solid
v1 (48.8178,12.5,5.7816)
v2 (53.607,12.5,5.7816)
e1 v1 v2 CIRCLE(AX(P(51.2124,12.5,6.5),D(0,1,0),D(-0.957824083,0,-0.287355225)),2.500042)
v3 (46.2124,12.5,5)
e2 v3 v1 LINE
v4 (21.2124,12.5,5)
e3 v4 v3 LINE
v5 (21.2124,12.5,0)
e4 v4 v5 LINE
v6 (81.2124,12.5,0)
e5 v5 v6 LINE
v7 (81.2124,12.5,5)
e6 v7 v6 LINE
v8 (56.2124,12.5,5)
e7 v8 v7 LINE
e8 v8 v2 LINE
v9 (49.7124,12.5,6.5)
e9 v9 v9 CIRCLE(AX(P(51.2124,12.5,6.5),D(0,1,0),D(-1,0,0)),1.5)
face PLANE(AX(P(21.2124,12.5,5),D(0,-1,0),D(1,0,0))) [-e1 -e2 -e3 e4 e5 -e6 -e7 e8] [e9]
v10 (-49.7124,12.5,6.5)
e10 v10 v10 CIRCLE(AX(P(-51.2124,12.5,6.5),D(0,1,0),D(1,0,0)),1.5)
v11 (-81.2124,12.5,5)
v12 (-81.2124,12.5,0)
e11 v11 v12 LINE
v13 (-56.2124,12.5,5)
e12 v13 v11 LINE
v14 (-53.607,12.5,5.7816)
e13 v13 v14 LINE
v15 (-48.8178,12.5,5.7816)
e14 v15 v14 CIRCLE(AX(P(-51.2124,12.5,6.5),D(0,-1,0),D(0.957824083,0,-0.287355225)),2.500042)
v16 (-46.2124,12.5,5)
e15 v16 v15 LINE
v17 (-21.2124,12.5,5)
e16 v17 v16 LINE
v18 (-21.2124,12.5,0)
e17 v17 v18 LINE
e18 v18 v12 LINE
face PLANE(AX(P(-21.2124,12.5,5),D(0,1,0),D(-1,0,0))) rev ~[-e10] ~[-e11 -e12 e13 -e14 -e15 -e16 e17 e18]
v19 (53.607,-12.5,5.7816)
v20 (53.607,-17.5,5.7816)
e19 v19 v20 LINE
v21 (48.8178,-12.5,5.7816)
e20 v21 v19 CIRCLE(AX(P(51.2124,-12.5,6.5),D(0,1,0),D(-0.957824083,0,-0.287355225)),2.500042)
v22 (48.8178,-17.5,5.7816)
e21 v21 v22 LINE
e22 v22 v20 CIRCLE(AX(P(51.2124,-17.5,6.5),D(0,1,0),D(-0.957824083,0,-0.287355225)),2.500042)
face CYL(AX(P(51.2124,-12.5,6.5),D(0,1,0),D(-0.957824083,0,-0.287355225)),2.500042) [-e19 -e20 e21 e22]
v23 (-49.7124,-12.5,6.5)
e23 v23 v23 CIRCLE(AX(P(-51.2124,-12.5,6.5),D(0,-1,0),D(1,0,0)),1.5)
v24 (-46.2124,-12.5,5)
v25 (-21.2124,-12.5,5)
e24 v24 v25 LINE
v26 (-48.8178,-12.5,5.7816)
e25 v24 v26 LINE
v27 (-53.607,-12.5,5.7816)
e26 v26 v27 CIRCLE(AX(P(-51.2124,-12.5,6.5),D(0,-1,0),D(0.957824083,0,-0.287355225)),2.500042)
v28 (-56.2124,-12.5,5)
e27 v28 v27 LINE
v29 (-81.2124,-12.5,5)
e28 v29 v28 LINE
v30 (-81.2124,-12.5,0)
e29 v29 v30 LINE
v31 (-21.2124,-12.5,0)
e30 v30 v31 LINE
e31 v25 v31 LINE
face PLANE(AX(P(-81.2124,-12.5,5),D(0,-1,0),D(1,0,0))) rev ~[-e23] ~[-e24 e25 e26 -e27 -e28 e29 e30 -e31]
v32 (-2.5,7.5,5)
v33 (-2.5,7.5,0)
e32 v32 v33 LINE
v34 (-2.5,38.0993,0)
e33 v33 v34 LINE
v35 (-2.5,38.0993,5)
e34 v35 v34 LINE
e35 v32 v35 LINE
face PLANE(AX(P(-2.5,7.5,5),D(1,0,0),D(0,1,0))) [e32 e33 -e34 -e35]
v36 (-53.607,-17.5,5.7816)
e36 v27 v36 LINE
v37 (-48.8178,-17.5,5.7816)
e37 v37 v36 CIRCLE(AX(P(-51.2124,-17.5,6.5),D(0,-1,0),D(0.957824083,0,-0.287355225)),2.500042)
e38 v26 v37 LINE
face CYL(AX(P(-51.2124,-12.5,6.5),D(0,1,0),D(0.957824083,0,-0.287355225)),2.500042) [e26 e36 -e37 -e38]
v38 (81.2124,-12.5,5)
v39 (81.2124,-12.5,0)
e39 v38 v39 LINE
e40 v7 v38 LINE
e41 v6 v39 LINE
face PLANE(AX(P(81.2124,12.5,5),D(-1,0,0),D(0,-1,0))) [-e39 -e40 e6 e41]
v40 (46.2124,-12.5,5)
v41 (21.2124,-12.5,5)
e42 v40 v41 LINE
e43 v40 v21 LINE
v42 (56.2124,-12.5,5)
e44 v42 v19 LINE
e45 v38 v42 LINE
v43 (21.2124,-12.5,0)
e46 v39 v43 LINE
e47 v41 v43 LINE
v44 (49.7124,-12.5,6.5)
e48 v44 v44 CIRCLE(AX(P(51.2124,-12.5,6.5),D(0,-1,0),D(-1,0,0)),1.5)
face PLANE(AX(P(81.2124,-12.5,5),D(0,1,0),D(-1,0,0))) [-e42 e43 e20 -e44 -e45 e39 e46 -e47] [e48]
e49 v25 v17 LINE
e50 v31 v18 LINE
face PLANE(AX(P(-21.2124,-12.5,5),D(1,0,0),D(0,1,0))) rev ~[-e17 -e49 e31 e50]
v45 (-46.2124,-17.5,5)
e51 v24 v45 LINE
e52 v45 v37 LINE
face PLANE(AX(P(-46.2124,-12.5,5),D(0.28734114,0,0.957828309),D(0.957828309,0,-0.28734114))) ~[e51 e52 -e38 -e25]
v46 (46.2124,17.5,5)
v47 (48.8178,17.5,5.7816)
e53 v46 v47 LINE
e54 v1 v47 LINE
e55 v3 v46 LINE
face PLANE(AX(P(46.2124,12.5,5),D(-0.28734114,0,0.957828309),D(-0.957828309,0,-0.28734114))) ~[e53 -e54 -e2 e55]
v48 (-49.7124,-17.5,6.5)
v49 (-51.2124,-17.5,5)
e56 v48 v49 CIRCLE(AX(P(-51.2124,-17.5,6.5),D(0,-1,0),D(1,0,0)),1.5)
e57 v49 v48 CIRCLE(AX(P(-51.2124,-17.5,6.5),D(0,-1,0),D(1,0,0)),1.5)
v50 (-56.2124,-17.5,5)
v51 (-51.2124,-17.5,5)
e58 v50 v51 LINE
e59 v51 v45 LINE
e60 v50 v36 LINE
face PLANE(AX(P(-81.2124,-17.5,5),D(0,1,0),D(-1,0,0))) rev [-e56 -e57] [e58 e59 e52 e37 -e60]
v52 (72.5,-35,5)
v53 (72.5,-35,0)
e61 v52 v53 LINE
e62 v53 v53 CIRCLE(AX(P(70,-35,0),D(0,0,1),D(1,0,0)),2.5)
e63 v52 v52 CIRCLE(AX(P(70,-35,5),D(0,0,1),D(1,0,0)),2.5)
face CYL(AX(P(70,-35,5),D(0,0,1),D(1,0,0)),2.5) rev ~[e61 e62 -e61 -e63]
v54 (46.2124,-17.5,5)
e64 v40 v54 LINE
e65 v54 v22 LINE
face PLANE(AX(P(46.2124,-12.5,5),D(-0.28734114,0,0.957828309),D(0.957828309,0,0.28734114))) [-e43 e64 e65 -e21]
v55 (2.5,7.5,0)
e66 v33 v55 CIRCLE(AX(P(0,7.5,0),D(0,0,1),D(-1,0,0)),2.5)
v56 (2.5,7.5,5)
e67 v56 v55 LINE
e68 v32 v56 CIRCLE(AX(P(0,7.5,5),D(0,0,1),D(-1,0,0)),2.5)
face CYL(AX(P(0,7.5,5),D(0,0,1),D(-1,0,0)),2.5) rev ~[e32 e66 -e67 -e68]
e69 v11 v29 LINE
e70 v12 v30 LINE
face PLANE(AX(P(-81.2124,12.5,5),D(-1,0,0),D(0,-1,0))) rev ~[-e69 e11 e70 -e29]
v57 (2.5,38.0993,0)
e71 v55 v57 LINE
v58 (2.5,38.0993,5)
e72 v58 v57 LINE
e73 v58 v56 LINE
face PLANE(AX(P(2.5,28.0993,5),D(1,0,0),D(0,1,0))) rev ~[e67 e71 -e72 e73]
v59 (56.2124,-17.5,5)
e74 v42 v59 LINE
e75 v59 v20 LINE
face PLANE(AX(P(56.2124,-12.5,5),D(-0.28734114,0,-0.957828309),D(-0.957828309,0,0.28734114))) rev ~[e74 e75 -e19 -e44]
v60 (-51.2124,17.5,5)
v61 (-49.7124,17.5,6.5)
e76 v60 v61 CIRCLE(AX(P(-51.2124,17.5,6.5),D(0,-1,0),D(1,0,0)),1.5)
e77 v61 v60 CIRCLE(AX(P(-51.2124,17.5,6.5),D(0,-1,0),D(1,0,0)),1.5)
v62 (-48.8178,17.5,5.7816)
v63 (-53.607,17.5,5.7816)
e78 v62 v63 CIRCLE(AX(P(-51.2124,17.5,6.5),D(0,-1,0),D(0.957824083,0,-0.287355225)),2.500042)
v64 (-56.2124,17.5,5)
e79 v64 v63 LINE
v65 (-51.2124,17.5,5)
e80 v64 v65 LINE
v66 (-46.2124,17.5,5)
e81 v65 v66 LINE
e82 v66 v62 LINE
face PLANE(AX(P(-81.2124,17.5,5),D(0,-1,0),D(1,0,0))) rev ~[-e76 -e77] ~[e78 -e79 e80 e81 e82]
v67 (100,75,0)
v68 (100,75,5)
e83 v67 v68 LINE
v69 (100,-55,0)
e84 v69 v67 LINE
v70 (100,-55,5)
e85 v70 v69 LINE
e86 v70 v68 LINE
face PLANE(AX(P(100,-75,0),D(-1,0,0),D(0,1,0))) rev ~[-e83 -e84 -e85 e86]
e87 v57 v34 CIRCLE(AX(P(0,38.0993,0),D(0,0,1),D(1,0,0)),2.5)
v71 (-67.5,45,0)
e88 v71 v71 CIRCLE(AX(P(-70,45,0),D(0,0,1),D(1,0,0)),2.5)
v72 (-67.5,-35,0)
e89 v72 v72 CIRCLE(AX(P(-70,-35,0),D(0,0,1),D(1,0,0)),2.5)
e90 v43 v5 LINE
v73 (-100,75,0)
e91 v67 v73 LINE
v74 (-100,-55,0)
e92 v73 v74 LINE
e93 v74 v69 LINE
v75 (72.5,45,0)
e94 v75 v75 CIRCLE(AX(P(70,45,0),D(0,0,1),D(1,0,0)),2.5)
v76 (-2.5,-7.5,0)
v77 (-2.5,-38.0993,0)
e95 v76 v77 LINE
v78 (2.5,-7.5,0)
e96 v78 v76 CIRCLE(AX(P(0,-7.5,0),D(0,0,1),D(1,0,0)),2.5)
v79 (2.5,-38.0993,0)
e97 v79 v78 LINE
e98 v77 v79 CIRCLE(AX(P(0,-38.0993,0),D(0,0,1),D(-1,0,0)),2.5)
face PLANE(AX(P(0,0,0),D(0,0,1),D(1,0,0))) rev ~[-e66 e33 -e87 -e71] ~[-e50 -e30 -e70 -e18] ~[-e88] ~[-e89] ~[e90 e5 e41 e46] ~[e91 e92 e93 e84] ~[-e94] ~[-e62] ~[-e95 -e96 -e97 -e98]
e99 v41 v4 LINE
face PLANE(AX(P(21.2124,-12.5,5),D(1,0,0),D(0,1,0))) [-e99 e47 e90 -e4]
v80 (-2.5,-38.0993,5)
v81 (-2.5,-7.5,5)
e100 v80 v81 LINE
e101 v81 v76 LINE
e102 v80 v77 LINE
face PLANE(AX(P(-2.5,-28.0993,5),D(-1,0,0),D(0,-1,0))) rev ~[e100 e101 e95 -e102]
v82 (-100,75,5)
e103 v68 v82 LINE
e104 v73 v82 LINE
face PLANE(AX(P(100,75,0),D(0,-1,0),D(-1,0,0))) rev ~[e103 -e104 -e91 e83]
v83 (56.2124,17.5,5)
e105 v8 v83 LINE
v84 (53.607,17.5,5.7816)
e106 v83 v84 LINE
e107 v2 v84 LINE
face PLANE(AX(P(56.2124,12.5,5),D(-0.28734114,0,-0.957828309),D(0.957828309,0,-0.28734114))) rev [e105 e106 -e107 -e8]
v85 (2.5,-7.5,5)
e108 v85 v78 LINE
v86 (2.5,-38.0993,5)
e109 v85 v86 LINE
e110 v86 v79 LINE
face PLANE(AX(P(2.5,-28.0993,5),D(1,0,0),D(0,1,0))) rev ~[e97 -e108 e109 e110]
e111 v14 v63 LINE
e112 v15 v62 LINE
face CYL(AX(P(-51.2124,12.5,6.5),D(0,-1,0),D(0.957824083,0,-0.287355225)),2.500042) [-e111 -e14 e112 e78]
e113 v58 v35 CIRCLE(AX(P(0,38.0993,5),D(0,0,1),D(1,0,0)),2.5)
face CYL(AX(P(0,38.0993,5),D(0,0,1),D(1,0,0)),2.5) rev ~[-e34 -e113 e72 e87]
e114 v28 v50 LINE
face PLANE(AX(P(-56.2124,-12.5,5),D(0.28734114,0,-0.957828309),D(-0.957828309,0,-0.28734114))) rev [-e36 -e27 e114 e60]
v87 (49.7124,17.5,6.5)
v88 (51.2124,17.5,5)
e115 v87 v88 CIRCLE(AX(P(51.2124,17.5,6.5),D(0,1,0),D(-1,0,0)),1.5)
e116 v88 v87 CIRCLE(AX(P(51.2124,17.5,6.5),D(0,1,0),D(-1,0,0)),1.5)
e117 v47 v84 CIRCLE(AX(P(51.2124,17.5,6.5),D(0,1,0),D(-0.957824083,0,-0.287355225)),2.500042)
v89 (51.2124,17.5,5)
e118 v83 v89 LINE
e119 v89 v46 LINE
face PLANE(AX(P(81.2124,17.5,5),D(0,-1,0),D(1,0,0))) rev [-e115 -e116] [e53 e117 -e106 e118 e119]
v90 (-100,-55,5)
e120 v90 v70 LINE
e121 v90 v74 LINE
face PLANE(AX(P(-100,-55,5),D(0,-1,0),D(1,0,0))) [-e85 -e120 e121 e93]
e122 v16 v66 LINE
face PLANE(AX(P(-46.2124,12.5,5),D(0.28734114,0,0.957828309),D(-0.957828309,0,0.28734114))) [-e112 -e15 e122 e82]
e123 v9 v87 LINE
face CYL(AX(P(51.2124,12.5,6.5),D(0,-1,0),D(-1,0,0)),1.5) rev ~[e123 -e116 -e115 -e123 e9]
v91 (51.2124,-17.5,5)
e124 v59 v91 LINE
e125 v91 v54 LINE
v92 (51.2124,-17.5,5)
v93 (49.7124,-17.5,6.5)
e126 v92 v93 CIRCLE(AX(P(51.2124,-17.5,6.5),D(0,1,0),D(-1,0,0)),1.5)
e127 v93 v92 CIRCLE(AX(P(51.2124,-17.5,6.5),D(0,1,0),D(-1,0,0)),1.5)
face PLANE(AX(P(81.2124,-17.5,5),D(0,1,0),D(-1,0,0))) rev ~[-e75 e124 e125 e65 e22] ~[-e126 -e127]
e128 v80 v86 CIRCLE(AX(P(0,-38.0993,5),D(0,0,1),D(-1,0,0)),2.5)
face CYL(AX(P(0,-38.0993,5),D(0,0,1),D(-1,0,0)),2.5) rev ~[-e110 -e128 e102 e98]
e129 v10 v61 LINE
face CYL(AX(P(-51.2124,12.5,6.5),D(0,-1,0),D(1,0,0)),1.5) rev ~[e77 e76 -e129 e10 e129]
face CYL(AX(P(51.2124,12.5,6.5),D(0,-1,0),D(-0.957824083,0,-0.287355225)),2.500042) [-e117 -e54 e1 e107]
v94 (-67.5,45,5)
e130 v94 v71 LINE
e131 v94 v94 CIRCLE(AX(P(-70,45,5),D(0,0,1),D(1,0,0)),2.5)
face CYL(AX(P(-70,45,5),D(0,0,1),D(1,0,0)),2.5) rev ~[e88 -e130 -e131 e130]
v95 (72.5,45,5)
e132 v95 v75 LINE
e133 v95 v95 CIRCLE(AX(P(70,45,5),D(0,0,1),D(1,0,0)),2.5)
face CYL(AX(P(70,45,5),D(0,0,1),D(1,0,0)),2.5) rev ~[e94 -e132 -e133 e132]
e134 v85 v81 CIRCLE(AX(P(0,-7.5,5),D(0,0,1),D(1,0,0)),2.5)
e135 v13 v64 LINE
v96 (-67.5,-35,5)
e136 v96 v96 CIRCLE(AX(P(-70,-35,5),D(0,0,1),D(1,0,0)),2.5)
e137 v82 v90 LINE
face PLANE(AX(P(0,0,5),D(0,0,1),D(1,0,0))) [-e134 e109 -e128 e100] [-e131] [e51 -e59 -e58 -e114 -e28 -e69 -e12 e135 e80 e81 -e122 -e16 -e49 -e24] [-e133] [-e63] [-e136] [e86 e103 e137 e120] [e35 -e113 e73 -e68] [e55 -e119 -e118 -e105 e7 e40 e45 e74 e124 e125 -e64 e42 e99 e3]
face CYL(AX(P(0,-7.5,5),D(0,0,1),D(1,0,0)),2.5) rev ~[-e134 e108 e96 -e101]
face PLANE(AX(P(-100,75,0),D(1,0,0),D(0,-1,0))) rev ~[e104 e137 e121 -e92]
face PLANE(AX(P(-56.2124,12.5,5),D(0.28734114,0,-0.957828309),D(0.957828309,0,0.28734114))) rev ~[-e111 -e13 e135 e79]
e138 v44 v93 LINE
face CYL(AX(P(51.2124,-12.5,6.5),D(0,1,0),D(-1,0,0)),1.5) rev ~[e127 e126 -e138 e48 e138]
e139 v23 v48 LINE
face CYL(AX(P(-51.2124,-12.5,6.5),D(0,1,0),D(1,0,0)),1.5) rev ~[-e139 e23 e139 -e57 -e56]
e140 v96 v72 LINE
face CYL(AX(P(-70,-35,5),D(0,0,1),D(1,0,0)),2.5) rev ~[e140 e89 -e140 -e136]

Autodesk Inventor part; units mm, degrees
ref_plane "YZ Plane" through (0, 0, 0) normal (1, 0, 0) x (0, 1, 0)
ref_plane "XZ Plane" through (0, 0, 0) normal (0, 1, 0) x (-1, 0, 0)
sketch "Эскиз1" plane through (0, 0, 0) normal (0, 0, 1) x (1, 0, 0)
  line L0 (-100, -75) -> (100, -75)
  line L1 (100, -75) -> (100, 75)
  line L2 (100, 75) -> (-100, 75)
  line L3 (-100, 75) -> (-100, -75)
  line L4 (-100, -75) -> (100, 75) construction
  line L5 (100, -75) -> (-100, 75) construction
  point P0 (0, 0)
  dimension "d0" = 200
  dimension "d1" = 150
extrude "Выдавливание1" add sketch "Эскиз1" along normal blind 5
sketch "Эскиз2" plane through (0, 0, 5) normal (0, 0, 1) x (1, 0, 0)
  line L0 (-100, -75) -> (100, -75) projected
  line L1 (100, -75) -> (100, 75) projected
  line L2 (100, 75) -> (-100, 75) projected
  line L3 (-100, 75) -> (-100, -75) projected
  line L4 (100, 75) -> (-100, 75) construction
  line L5 (0, 75) -> (0, -75) construction
  line L6 (-100, 0) -> (100, 0) construction
  line L7 (100, -75) -> (100, 75) construction
  line L8 (-100, -12.5) -> (100, -12.5) construction
  line L9 (100, -12.5) -> (100, 12.5) construction
  line L10 (100, 12.5) -> (-100, 12.5) construction
  line L11 (-100, 12.5) -> (-100, -12.5) construction
  line L12 (-100, -12.5) -> (100, 12.5) construction
  line L13 (100, -12.5) -> (-100, 12.5) construction
  line L14 (-100, 0) -> (0, 0) construction
  line L15 (-51.2124, 75) -> (-51.2124, -75) construction
  line L16 (-100, -75) -> (100, -75) construction
  line L17 (0, 0) -> (100, 0) construction
  line L18 (50, 75) -> (50, -75) construction
  line L19 (-81.2124, -12.5) -> (-21.2124, -12.5)
  line L20 (-21.2124, -12.5) -> (-21.2124, 12.5)
  line L21 (-21.2124, 12.5) -> (-81.2124, 12.5)
  line L22 (-81.2124, 12.5) -> (-81.2124, -12.5)
  line L23 (-81.2124, -12.5) -> (-21.2124, 12.5) construction
  line L24 (-21.2124, -12.5) -> (-81.2124, 12.5) construction
  line L25 (81.2124, -12.5) -> (21.2124, -12.5)
  line L26 (21.2124, -12.5) -> (21.2124, 12.5)
  line L27 (21.2124, 12.5) -> (81.2124, 12.5)
  line L28 (81.2124, 12.5) -> (81.2124, -12.5)
  point P0 (-51.2124, 0)
  dimension "d4" = 25
  dimension "d5" = 60
extrude "Выдавливание2" cut sketch "Эскиз2" against normal blind 5 contours L22 L21 L20 L19 | L25 L26 L27 L28
sketch "Эскиз3" plane through (-81.2124, 12.5, 5) normal (0, -1, 0) x (1, 0, 0)
  line L0 (0, 0) -> (60, 0) projected
  line L1 (30, 0) -> (30, 14.9537) construction
  line L2 (30, 0) -> (40, 0) construction
  line L3 (30, 0) -> (35, 0) construction
  line L4 (30, 0) -> (25, 0) construction
  line L5 (25, 0) -> (35, 0) construction
  line L6 (25, 0) -> (35, 0)
  line L7 (30, 0) -> (30, 3) construction
  circle A0 centre (30, 1.5) radius 1.5
  arc A1 (32.3946, 0.7816) -> (27.6054, 0.7816) centre (30, 1.5) ccw
  line L8 (35, 0) -> (32.3946, 0.7816)
  line L9 (25, 0) -> (27.6054, 0.7816)
  point P0 (81.2124, -5)
  dimension "d8" = 10
  dimension "d9" = 5
  dimension "d10" = 5
  dimension "d11" = 3
  dimension "d12" = 1
extrude "Выдавливание3" add sketch "Эскиз3" against normal blind 5
mirror "Зеркальное отражение1" about plane through (0, 0, 0) normal (0, 1, 0) of "Выдавливание3"
sketch "Эскиз4" plane through (-81.2124, 12.5, 0) normal (0, -1, 0) x (1, 0, 0)
  circle A0 centre (30, 6.5) radius 1.5 projected
  point P0 (81.2124, 0)
surface extrude "ВыдавПврх1" sketch "Эскиз4" along normal up to next shown yes curves A0
boundary_patch "Участок поверхности1"
boundary_patch "Участок поверхности2"
ref_plane "РабПлоскость1" through (-81.2124, 0, 0) normal (0, -1, 0) x (1, 0, 0)
sketch "Эскиз6" plane through (0, 0, 5) normal (0, 0, 1) x (1, 0, 0)
  line L0 (81.2124, -12.5) -> (21.2124, -12.5) projected
  line L1 (21.2124, -12.5) -> (21.2124, 12.5) projected
  line L2 (21.2124, 12.5) -> (81.2124, 12.5) projected
  line L3 (81.2124, 12.5) -> (81.2124, -12.5) projected
  line L4 (-100, -75) -> (100, -75) projected
  line L5 (100, -75) -> (100, 75) projected
  line L6 (100, 75) -> (-100, 75) projected
  line L7 (-100, 75) -> (-100, -75) projected
  line L8 (-46.2124, -12.5) -> (-46.2124, -17.5) projected
  line L9 (-46.2124, -17.5) -> (-51.2124, -17.5) projected
  line L10 (-51.2124, -17.5) -> (-56.2124, -17.5) projected
  line L11 (-56.2124, -17.5) -> (-56.2124, -12.5) projected
  line L12 (-56.2124, -12.5) -> (-81.2124, -12.5) projected
  line L13 (-81.2124, -12.5) -> (-81.2124, 12.5) projected
  line L14 (-81.2124, 12.5) -> (-56.2124, 12.5) projected
  line L15 (-56.2124, 12.5) -> (-56.2124, 17.5) projected
  line L16 (-56.2124, 17.5) -> (-51.2124, 17.5) projected
  line L17 (-51.2124, 17.5) -> (-46.2124, 17.5) projected
  line L18 (-46.2124, 17.5) -> (-46.2124, 12.5) projected
  line L19 (-46.2124, 12.5) -> (-21.2124, 12.5) projected
  line L20 (-21.2124, 12.5) -> (-21.2124, -12.5) projected
  line L21 (-21.2124, -12.5) -> (-46.2124, -12.5) projected
  line L22 (-100, -75) -> (100, -75) construction
  line L23 (-21.2124, -75) -> (-21.2124, 75) construction
  line L24 (100, 75) -> (-100, 75) construction
  line L25 (-21.2124, 12.5) -> (-21.2124, 75) construction
  line L26 (-21.2124, 75) -> (21.2124, 75) construction
  line L27 (21.2124, 75) -> (21.2124, 12.5) construction
  line L28 (21.2124, 12.5) -> (-21.2124, 12.5) construction
  line L29 (-21.2124, 12.5) -> (-21.2124, 75) construction
  line L30 (-21.2124, -75) -> (21.2124, -75) construction
  line L31 (21.2124, -75) -> (21.2124, -12.5) construction
  line L32 (21.2124, -12.5) -> (-21.2124, -12.5) construction
  line L33 (-21.2124, -12.5) -> (-21.2124, -75) construction
  line L34 (100, -75) -> (100, 75) construction
  line L35 (-100, -7.5) -> (100, -7.5) construction
  line L36 (100, -7.5) -> (100, 7.5) construction
  line L37 (100, 7.5) -> (-100, 7.5) construction
  line L38 (-100, 7.5) -> (-100, -7.5) construction
  line L39 (-100, -7.5) -> (100, 7.5) construction
  line L40 (100, -7.5) -> (-100, 7.5) construction
  line L41 (0, 7.5) -> (0, 17.5) construction
  line L42 (0, -7.5) -> (0, -28.0993) construction
  line L43 (-2.5, -7.5) -> (-2.5, -28.0993)
  line L44 (2.5, -28.0993) -> (2.5, -7.5)
  arc A0 (2.5, -7.5) -> (-2.5, -7.5) centre (0, -7.5) ccw
  line L45 (-2.5, -28.0993) -> (-2.5, -38.0993)
  line L46 (2.5, -28.0993) -> (2.5, -38.0993)
  arc A1 (-2.5, -38.0993) -> (2.5, -38.0993) centre (0, -38.0993) ccw
  line L47 (-21.2124, 0) -> (21.2124, 0) construction
  line L48 (-2.5, 7.5) -> (-2.5, 28.0993)
  line L49 (2.5, 28.0993) -> (2.5, 7.5)
  arc A2 (-2.5, 7.5) -> (2.5, 7.5) centre (0, 7.5) ccw
  line L50 (-2.5, 28.0993) -> (-2.5, 38.0993)
  line L51 (2.5, 28.0993) -> (2.5, 38.0993)
  arc A3 (2.5, 38.0993) -> (-2.5, 38.0993) centre (0, 38.0993) ccw
  point P0 (0, 0)
  point P1 (0, -17.7997)
  point P2 (0, 17.7997)
  dimension "d24" = 15
  dimension "d25" = 10
  dimension "d27" = 10
extrude "Выдавливание5" cut sketch "Эскиз6" against normal blind 20 contours A0 L44 L46 A1 L45 L43 | L48 L50 A3 L51 L49 A2
mirror "Зеркальное отражение2" about plane through (0, 0, 0) normal (1, 0, 0) of "Выдавливание3", "ВыдавПврх1", "Зеркальное отражение1"
sketch "Эскиз7" plane through (0, 0, 5) normal (0, 0, 1) x (1, 0, 0)
  arc A0 (-2.5, -38.0993) -> (2.5, -38.0993) centre (0, -38.0993) ccw projected
  line L0 (-2.5, -38.0993) -> (-2.5, -7.5) projected
  arc A1 (2.5, -7.5) -> (-2.5, -7.5) centre (0, -7.5) ccw projected
  line L1 (2.5, -7.5) -> (2.5, -38.0993) projected
  arc A2 (2.5, 38.0993) -> (-2.5, 38.0993) centre (0, 38.0993) ccw projected
  line L2 (2.5, 38.0993) -> (2.5, 7.5) projected
  arc A3 (-2.5, 7.5) -> (2.5, 7.5) centre (0, 7.5) ccw projected
  line L3 (-2.5, 7.5) -> (-2.5, 38.0993) projected
  line L4 (-100, -75) -> (100, -75) projected
  line L5 (100, -75) -> (100, 75) projected
  line L6 (100, 75) -> (-100, 75) projected
  line L7 (-100, 75) -> (-100, -75) projected
  line L8 (-46.2124, -12.5) -> (-46.2124, -17.5) projected
  line L9 (-46.2124, -17.5) -> (-51.2124, -17.5) projected
  line L10 (-51.2124, -17.5) -> (-56.2124, -17.5) projected
  line L11 (-56.2124, -17.5) -> (-56.2124, -12.5) projected
  line L12 (-56.2124, -12.5) -> (-81.2124, -12.5) projected
  line L13 (-81.2124, -12.5) -> (-81.2124, 12.5) projected
  line L14 (-81.2124, 12.5) -> (-56.2124, 12.5) projected
  line L15 (-56.2124, 12.5) -> (-56.2124, 17.5) projected
  line L16 (-56.2124, 17.5) -> (-51.2124, 17.5) projected
  line L17 (-51.2124, 17.5) -> (-46.2124, 17.5) projected
  line L18 (-46.2124, 17.5) -> (-46.2124, 12.5) projected
  line L19 (-46.2124, 12.5) -> (-21.2124, 12.5) projected
  line L20 (-21.2124, 12.5) -> (-21.2124, -12.5) projected
  line L21 (-21.2124, -12.5) -> (-46.2124, -12.5) projected
  line L22 (56.2124, -12.5) -> (56.2124, -17.5) projected
  line L23 (56.2124, -17.5) -> (51.2124, -17.5) projected
  line L24 (51.2124, -17.5) -> (46.2124, -17.5) projected
  line L25 (46.2124, -17.5) -> (46.2124, -12.5) projected
  line L26 (46.2124, -12.5) -> (21.2124, -12.5) projected
  line L27 (21.2124, -12.5) -> (21.2124, 12.5) projected
  line L28 (21.2124, 12.5) -> (46.2124, 12.5) projected
  line L29 (46.2124, 12.5) -> (46.2124, 17.5) projected
  line L30 (46.2124, 17.5) -> (51.2124, 17.5) projected
  line L31 (51.2124, 17.5) -> (56.2124, 17.5) projected
  line L32 (56.2124, 17.5) -> (56.2124, 12.5) projected
  line L33 (56.2124, 12.5) -> (81.2124, 12.5) projected
  line L34 (81.2124, 12.5) -> (81.2124, -12.5) projected
  line L35 (81.2124, -12.5) -> (56.2124, -12.5) projected
  line L36 (-100, 75) -> (-70, 75) construction
  line L37 (-70, 75) -> (-70, 45) construction
  line L38 (-70, 45) -> (-100, 45) construction
  line L39 (-100, 45) -> (-100, 75) construction
  circle A4 centre (-70, 45) radius 2.5
  line L40 (100, -75) -> (100, 75) construction
  line L41 (100, 0) -> (-100, 0) construction
  line L42 (100, 75) -> (-100, 75) construction
  line L43 (0, 75) -> (0, -75) construction
  line L44 (-100, -75) -> (100, -75) construction
  circle A5 centre (70, 45) radius 2.5
  line L45 (-100, -75) -> (100, -75) projected
  line L46 (-70, -75) -> (-70, -35) construction
  line L47 (-70, -35) -> (-100, -35) construction
  circle A6 centre (-70, -35) radius 2.5
  line L48 (70, -75) -> (70, -35) construction
  line L49 (70, -35) -> (100, -35) construction
  circle A7 centre (70, -35) radius 2.5
  line L50 (-100, -75) -> (-100, -55)
  line L51 (-100, -55) -> (100, -55)
  line L52 (100, -75) -> (100, -55)
  point P0 (0, 0)
  dimension "d30" = 30
  dimension "d31" = 30
  dimension "d32" = 5
  dimension "d35" = 40
  dimension "d36" = 5
  dimension "d37" = 20
extrude "Выдавливание6" cut sketch "Эскиз7" against normal blind 20 contours L7 L51 L5 L4 | A4 | A5 | A6 | A7
properties part number "Down"
